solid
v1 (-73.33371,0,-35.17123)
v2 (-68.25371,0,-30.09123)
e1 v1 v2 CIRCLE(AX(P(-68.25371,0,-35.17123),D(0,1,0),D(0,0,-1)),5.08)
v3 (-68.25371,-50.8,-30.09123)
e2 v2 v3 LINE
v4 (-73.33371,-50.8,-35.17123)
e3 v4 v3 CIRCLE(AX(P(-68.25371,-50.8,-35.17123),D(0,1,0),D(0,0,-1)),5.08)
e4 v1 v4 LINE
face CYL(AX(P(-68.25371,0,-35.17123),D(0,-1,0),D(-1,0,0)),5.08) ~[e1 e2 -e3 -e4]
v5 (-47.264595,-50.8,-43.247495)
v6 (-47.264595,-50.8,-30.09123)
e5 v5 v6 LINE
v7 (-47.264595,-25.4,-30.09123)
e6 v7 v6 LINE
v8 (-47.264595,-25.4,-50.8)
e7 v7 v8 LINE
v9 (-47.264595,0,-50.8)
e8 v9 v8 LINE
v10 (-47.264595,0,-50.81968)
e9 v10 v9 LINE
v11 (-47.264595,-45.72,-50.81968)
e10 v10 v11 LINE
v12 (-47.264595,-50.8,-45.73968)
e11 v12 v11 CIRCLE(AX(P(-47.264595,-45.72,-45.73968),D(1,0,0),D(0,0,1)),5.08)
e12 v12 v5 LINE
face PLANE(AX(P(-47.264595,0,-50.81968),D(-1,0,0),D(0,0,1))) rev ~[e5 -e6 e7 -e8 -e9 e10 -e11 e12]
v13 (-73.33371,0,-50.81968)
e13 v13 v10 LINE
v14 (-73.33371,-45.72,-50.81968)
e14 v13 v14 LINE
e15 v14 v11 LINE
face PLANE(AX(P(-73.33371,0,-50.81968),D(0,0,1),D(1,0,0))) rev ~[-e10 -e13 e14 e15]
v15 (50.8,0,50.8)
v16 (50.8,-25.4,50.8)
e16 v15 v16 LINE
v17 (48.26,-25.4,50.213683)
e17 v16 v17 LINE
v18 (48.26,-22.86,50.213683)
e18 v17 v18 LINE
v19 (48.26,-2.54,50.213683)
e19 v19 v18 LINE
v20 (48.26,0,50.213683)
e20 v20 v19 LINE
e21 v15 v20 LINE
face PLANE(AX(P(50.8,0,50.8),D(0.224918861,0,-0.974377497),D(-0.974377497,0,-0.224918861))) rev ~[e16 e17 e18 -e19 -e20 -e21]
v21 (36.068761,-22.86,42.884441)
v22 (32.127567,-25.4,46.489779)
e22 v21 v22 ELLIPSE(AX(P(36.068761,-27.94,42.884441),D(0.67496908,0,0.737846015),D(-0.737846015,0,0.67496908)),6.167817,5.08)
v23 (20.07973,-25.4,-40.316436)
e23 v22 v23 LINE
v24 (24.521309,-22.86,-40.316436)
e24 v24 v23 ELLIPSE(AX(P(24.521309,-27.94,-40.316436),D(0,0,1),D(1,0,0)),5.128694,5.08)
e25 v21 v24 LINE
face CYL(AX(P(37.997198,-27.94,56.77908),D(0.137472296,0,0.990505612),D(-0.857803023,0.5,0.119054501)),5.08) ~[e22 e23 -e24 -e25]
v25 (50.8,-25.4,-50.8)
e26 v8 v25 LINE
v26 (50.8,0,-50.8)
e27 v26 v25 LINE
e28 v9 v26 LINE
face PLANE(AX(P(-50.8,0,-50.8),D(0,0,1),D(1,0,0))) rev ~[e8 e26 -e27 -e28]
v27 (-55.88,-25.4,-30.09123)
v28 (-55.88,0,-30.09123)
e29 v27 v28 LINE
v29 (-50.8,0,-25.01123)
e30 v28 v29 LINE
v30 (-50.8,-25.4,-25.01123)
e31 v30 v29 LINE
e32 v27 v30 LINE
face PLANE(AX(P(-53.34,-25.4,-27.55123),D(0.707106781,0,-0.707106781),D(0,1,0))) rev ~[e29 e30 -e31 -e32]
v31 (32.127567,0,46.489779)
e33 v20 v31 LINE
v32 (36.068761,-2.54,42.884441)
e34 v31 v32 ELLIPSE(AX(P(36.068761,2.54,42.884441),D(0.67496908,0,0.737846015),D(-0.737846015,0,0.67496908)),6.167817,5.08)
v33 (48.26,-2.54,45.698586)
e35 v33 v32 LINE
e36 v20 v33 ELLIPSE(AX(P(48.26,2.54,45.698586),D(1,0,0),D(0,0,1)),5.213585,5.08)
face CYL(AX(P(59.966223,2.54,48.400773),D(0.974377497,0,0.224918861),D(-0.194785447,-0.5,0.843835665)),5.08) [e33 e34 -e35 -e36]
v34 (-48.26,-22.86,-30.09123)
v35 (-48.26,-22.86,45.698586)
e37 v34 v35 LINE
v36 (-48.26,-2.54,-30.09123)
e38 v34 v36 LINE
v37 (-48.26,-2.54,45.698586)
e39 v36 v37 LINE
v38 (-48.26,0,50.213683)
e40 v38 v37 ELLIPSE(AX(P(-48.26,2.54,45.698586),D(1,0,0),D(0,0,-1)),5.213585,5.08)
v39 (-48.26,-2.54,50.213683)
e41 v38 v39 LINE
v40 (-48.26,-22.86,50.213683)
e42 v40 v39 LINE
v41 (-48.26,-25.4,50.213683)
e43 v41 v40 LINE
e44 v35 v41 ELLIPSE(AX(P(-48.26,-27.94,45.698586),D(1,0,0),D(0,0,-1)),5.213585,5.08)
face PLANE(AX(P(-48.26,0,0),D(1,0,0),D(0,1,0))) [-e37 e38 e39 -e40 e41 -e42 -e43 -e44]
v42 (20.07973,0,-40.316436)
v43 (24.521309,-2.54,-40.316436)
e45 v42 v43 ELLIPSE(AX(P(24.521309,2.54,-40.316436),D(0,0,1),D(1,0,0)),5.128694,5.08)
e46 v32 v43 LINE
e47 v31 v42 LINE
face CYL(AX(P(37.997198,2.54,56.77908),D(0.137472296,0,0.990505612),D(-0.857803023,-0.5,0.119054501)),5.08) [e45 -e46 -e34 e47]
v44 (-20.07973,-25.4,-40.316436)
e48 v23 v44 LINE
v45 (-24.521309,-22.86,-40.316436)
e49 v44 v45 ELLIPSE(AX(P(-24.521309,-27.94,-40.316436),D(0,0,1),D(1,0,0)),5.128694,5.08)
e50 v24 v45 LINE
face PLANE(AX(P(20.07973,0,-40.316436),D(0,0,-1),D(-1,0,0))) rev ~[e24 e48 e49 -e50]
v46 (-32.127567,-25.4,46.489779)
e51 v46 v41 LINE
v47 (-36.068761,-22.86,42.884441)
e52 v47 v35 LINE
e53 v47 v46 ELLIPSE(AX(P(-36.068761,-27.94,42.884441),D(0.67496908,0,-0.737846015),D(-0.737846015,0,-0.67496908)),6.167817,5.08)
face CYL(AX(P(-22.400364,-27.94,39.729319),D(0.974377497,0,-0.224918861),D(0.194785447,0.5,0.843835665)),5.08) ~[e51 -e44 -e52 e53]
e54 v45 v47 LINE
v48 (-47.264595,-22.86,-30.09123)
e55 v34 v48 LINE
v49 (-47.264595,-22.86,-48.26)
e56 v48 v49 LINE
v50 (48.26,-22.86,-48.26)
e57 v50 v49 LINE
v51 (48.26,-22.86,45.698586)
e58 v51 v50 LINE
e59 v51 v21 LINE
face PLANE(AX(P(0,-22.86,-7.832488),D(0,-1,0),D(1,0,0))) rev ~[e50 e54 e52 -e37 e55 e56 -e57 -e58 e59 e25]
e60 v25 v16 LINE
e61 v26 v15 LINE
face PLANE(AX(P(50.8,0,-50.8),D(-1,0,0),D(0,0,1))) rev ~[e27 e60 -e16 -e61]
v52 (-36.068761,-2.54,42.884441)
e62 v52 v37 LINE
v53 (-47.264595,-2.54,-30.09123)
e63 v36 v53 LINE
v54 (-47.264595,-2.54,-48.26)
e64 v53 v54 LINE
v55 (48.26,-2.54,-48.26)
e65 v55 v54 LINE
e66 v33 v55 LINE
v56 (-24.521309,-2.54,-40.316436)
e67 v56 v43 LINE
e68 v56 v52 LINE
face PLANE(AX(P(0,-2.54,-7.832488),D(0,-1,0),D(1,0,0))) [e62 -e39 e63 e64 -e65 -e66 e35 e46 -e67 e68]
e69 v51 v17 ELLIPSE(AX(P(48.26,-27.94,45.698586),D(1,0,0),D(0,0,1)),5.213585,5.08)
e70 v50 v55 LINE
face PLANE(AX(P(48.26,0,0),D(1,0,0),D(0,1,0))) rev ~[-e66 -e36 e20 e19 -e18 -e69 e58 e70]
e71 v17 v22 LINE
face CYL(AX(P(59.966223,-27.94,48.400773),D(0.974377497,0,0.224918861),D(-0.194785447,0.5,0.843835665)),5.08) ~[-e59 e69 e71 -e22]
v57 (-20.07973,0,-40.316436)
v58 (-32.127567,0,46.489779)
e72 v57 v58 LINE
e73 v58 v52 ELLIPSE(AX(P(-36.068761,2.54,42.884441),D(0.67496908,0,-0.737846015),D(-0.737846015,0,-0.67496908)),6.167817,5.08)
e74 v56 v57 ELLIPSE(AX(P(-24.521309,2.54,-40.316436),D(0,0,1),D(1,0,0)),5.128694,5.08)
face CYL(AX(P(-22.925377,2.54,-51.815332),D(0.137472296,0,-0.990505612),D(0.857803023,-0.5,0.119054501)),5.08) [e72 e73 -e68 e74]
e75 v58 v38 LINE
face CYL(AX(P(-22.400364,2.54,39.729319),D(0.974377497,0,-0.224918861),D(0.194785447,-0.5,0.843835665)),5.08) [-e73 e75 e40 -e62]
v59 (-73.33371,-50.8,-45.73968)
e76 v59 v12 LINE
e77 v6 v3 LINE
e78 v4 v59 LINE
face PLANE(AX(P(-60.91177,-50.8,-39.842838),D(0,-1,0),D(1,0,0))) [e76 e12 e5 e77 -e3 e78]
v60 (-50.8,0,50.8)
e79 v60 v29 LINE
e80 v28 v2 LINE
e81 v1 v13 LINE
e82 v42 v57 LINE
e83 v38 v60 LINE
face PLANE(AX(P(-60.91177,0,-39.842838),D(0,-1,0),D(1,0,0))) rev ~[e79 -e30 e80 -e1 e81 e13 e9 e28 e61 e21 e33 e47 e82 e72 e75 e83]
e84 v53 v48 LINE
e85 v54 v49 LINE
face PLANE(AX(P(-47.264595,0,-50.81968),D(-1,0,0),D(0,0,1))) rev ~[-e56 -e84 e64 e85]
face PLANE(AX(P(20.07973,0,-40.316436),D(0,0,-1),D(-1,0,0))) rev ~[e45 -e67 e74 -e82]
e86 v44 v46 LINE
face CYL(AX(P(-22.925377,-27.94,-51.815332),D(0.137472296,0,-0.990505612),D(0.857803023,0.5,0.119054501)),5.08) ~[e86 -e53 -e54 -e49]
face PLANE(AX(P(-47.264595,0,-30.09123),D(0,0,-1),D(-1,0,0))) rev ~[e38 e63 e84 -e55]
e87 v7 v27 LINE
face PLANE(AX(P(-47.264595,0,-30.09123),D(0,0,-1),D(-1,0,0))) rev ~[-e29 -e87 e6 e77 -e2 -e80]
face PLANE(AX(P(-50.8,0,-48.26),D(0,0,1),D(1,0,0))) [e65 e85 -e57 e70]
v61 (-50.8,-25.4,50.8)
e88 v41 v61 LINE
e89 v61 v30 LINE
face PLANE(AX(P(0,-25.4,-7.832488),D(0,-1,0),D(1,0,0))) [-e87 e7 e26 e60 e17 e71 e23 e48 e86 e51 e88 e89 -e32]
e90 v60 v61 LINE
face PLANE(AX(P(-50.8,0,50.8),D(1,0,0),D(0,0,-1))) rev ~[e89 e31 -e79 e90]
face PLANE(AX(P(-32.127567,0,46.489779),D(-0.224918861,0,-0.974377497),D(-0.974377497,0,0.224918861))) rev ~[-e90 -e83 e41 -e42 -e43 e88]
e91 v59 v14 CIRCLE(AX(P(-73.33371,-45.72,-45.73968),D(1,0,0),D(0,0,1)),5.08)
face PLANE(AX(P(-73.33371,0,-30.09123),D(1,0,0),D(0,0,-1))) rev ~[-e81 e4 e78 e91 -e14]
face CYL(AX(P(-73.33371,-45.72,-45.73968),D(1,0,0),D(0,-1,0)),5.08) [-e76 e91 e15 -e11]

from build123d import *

# Parameters (mm, degrees)
F1_DEPTH     = 25.4
F2_T         = -2.54
F3_T4_DEPTH  = 109.6353324848
F3_T9_DEPTH  = 109.6353324848
F3_T14_DEPTH = 38.5537016023
F3_T19_DEPTH = 38.5537016023
F3_T24_DEPTH = 109.6353324848
F3_T29_DEPTH = 38.5537016023
F3_T34_DEPTH = 109.6353324848
F3_T39_DEPTH = 38.5537016023
F4_W         = 7.5721852481
F4_H         = 7.5721852481
F5_DEPTH     = 50.8
F6_SIZE      = 5.08
F7_R         = 5.08


# Not quite as in the source:
# - a fillet or chamfer that OpenCascade refuses, or shapes differently, is made with other operations: its cross-section is extruded or revolved along the edge and cut away or added


with BuildPart() as f1:
    # F0 (on Front) → F1 (new body)
    with BuildSketch(Plane.XZ):
        Polygon((-50.8, -50.8), (50.8, -50.8), (50.8, 50.8), (32.1275666356, 46.4897789061), (20.0797300786, -40.3164364398), (-20.0797300786, -40.3164364398), (-32.1275666356, 46.4897789061), (-50.8, 50.8), align=None)
    extrude(amount=F1_DEPTH)

    # F2
    f2_openings = [f1.faces().sort_by_distance(p)[0] for p in [
        (-41.463783, -12.7, 48.644889),
        (-26.103648, -12.7, 3.086671),
        (0, -12.7, -40.316436),
        (41.463783, -12.7, 48.644889),
        (26.103648, -12.7, 3.086671),
    ]]
    offset(amount=F2_T, openings=f2_openings)

    # F3: fillet of radius 5.08 on 8 edges, made by hand


with BuildPart() as f3_tool2:
    # F3_s3 → F3_t4 (new body)
    with BuildSketch(Plane(origin=(8.4495366949, 0, 60.8800010222), x_dir=(0, 1, 0), z_dir=(-0.1374722959, 0, -0.9905056122))):
        with BuildLine():
            ThreePointArc((0, 25.4314784161), (-1.8594090512, 27.2908874673), (-2.54, 29.8308874673))
            Line((-2.54, 29.8308874673), (-2.54, 25.4314784161))
            Line((-2.54, 25.4314784161), (0, 25.4314784161))
        make_face()
    extrude(amount=F3_T4_DEPTH)

    split(bisect_by=Plane.XY.offset(-40.3164364398), keep=Keep.TOP)


with BuildPart() as f1_1:
    add(f1.part)

    # F3_t1: cut F3_tool2
    add(f3_tool2.part, mode=Mode.SUBTRACT)


with BuildPart() as f3_tool7:
    # F3_s8 → F3_t9 (new body)
    with BuildSketch(Plane(origin=(6.6222841773, 0, -47.7144111022), x_dir=(0, 1, 0), z_dir=(-0.1374722959, 0, 0.9905056122))):
        with BuildLine():
            ThreePointArc((0, 25.4314784161), (-1.8594090512, 27.2908874673), (-2.54, 29.8308874673))
            Line((-2.54, 29.8308874673), (-2.54, 25.4314784161))
            Line((-2.54, 25.4314784161), (0, 25.4314784161))
        make_face()
    extrude(amount=F3_T9_DEPTH)

    split(bisect_by=Plane.XY.offset(-40.3164364398), keep=Keep.TOP)


with BuildPart() as f1_2:
    add(f1_1.part)

    # F3_t6: cut F3_tool7
    add(f3_tool7.part, mode=Mode.SUBTRACT)


with BuildPart() as f3_tool12:
    # F3_s13 → F3_t14 (new body)
    with BuildSketch(Plane(origin=(67.5399359806, 0, 15.5904723858), x_dir=(0, 1, 0), z_dir=(-0.9743774967, 0, -0.2249188607))):
        with BuildLine():
            ThreePointArc((0, -38.0724987065), (-1.8594090512, -36.2130896553), (-2.54, -33.6730896553))
            Line((-2.54, -33.6730896553), (-2.54, -38.0724987065))
            Line((-2.54, -38.0724987065), (0, -38.0724987065))
        make_face()
    extrude(amount=F3_T14_DEPTH)

    split(bisect_by=Plane.YZ.offset(48.26), keep=Keep.BOTTOM)


with BuildPart() as f1_3:
    add(f1_2.part)

    # F3_t11: cut F3_tool12
    add(f3_tool12.part, mode=Mode.SUBTRACT)


with BuildPart() as f3_tool17:
    # F3_s18 → F3_t19 (new body)
    with BuildSketch(Plane(origin=(-29.9740767247, 0, 6.9190177438), x_dir=(0, 1, 0), z_dir=(-0.9743774967, 0, 0.2249188607))):
        with BuildLine():
            ThreePointArc((0, -38.0724987065), (-1.8594090512, -36.2130896553), (-2.54, -33.6730896553))
            Line((-2.54, -33.6730896553), (-2.54, -38.0724987065))
            Line((-2.54, -38.0724987065), (0, -38.0724987065))
        make_face()
    extrude(amount=F3_T19_DEPTH)

    split(bisect_by=Plane.YZ.offset(-48.26), keep=Keep.TOP)


with BuildPart() as f1_4:
    add(f1_3.part)

    # F3_t16: cut F3_tool17
    add(f3_tool17.part, mode=Mode.SUBTRACT)


with BuildPart() as f3_tool22:
    # F3_s23 → F3_t24 (new body)
    with BuildSketch(Plane(origin=(6.6222841773, 0, -47.7144111022), x_dir=(0, 1, 0), z_dir=(-0.1374722959, 0, 0.9905056122))):
        with BuildLine():
            ThreePointArc((-25.4, 25.4314784161), (-23.5405909488, 27.2908874673), (-22.86, 29.8308874673))
            Line((-22.86, 29.8308874673), (-22.86, 25.4314784161))
            Line((-22.86, 25.4314784161), (-25.4, 25.4314784161))
        make_face()
    extrude(amount=F3_T24_DEPTH)

    split(bisect_by=Plane.XY.offset(-40.3164364398), keep=Keep.TOP)


with BuildPart() as f1_5:
    add(f1_4.part)

    # F3_t21: cut F3_tool22
    add(f3_tool22.part, mode=Mode.SUBTRACT)


with BuildPart() as f3_tool27:
    # F3_s28 → F3_t29 (new body)
    with BuildSketch(Plane(origin=(-29.9740767247, 0, 6.9190177438), x_dir=(0, 1, 0), z_dir=(-0.9743774967, 0, 0.2249188607))):
        with BuildLine():
            ThreePointArc((-25.4, -38.0724987065), (-23.5405909488, -36.2130896553), (-22.86, -33.6730896553))
            Line((-22.86, -33.6730896553), (-22.86, -38.0724987065))
            Line((-22.86, -38.0724987065), (-25.4, -38.0724987065))
        make_face()
    extrude(amount=F3_T29_DEPTH)

    split(bisect_by=Plane.YZ.offset(-48.26), keep=Keep.TOP)


with BuildPart() as f1_6:
    add(f1_5.part)

    # F3_t26: cut F3_tool27
    add(f3_tool27.part, mode=Mode.SUBTRACT)


with BuildPart() as f3_tool32:
    # F3_s33 → F3_t34 (new body)
    with BuildSketch(Plane(origin=(8.4495366949, 0, 60.8800010222), x_dir=(0, 1, 0), z_dir=(-0.1374722959, 0, -0.9905056122))):
        with BuildLine():
            ThreePointArc((-25.4, 25.4314784161), (-23.5405909488, 27.2908874673), (-22.86, 29.8308874673))
            Line((-22.86, 29.8308874673), (-22.86, 25.4314784161))
            Line((-22.86, 25.4314784161), (-25.4, 25.4314784161))
        make_face()
    extrude(amount=F3_T34_DEPTH)

    split(bisect_by=Plane.XY.offset(-40.3164364398), keep=Keep.TOP)


with BuildPart() as f1_7:
    add(f1_6.part)

    # F3_t31: cut F3_tool32
    add(f3_tool32.part, mode=Mode.SUBTRACT)


with BuildPart() as f3_tool37:
    # F3_s38 → F3_t39 (new body)
    with BuildSketch(Plane(origin=(67.5399359806, 0, 15.5904723858), x_dir=(0, 1, 0), z_dir=(-0.9743774967, 0, -0.2249188607))):
        with BuildLine():
            ThreePointArc((-25.4, -38.0724987065), (-23.5405909488, -36.2130896553), (-22.86, -33.6730896553))
            Line((-22.86, -33.6730896553), (-22.86, -38.0724987065))
            Line((-22.86, -38.0724987065), (-25.4, -38.0724987065))
        make_face()
    extrude(amount=F3_T39_DEPTH)

    split(bisect_by=Plane.YZ.offset(48.26), keep=Keep.BOTTOM)


with BuildPart() as f1_8:
    add(f1_7.part)

    # F3_t36: cut F3_tool37
    add(f3_tool37.part, mode=Mode.SUBTRACT)

    # F4 (on Front) → F5 (join)
    with BuildSketch(Plane.XZ):
        Polygon((-73.3337104321, -50.8196800947), (-54.8367798328, -50.8196800947), (-54.8367798328, -43.2474948466), (-47.2645945847, -43.2474948466), (-47.2645945847, -30.0912298262), (-73.3337104321, -30.0912298262), align=None)
        with Locations((-51.0506872088, -47.0335874707)):
            Rectangle(F4_W, F4_H)
    extrude(amount=F5_DEPTH)

    # F6
    f6_edges = [f1_8.edges().sort_by_distance(p)[0] for p in [
        (-50.8, -12.7, -30.09123),
    ]]
    chamfer(f6_edges, length=F6_SIZE)

    # F7
    f7_edges = [f1_8.edges().sort_by_distance(p)[0] for p in [
        (-73.33371, -25.4, -30.09123),
        (-60.299153, -50.8, -50.81968),
    ]]
    fillet(f7_edges, radius=F7_R)


solid = f1_8.part
